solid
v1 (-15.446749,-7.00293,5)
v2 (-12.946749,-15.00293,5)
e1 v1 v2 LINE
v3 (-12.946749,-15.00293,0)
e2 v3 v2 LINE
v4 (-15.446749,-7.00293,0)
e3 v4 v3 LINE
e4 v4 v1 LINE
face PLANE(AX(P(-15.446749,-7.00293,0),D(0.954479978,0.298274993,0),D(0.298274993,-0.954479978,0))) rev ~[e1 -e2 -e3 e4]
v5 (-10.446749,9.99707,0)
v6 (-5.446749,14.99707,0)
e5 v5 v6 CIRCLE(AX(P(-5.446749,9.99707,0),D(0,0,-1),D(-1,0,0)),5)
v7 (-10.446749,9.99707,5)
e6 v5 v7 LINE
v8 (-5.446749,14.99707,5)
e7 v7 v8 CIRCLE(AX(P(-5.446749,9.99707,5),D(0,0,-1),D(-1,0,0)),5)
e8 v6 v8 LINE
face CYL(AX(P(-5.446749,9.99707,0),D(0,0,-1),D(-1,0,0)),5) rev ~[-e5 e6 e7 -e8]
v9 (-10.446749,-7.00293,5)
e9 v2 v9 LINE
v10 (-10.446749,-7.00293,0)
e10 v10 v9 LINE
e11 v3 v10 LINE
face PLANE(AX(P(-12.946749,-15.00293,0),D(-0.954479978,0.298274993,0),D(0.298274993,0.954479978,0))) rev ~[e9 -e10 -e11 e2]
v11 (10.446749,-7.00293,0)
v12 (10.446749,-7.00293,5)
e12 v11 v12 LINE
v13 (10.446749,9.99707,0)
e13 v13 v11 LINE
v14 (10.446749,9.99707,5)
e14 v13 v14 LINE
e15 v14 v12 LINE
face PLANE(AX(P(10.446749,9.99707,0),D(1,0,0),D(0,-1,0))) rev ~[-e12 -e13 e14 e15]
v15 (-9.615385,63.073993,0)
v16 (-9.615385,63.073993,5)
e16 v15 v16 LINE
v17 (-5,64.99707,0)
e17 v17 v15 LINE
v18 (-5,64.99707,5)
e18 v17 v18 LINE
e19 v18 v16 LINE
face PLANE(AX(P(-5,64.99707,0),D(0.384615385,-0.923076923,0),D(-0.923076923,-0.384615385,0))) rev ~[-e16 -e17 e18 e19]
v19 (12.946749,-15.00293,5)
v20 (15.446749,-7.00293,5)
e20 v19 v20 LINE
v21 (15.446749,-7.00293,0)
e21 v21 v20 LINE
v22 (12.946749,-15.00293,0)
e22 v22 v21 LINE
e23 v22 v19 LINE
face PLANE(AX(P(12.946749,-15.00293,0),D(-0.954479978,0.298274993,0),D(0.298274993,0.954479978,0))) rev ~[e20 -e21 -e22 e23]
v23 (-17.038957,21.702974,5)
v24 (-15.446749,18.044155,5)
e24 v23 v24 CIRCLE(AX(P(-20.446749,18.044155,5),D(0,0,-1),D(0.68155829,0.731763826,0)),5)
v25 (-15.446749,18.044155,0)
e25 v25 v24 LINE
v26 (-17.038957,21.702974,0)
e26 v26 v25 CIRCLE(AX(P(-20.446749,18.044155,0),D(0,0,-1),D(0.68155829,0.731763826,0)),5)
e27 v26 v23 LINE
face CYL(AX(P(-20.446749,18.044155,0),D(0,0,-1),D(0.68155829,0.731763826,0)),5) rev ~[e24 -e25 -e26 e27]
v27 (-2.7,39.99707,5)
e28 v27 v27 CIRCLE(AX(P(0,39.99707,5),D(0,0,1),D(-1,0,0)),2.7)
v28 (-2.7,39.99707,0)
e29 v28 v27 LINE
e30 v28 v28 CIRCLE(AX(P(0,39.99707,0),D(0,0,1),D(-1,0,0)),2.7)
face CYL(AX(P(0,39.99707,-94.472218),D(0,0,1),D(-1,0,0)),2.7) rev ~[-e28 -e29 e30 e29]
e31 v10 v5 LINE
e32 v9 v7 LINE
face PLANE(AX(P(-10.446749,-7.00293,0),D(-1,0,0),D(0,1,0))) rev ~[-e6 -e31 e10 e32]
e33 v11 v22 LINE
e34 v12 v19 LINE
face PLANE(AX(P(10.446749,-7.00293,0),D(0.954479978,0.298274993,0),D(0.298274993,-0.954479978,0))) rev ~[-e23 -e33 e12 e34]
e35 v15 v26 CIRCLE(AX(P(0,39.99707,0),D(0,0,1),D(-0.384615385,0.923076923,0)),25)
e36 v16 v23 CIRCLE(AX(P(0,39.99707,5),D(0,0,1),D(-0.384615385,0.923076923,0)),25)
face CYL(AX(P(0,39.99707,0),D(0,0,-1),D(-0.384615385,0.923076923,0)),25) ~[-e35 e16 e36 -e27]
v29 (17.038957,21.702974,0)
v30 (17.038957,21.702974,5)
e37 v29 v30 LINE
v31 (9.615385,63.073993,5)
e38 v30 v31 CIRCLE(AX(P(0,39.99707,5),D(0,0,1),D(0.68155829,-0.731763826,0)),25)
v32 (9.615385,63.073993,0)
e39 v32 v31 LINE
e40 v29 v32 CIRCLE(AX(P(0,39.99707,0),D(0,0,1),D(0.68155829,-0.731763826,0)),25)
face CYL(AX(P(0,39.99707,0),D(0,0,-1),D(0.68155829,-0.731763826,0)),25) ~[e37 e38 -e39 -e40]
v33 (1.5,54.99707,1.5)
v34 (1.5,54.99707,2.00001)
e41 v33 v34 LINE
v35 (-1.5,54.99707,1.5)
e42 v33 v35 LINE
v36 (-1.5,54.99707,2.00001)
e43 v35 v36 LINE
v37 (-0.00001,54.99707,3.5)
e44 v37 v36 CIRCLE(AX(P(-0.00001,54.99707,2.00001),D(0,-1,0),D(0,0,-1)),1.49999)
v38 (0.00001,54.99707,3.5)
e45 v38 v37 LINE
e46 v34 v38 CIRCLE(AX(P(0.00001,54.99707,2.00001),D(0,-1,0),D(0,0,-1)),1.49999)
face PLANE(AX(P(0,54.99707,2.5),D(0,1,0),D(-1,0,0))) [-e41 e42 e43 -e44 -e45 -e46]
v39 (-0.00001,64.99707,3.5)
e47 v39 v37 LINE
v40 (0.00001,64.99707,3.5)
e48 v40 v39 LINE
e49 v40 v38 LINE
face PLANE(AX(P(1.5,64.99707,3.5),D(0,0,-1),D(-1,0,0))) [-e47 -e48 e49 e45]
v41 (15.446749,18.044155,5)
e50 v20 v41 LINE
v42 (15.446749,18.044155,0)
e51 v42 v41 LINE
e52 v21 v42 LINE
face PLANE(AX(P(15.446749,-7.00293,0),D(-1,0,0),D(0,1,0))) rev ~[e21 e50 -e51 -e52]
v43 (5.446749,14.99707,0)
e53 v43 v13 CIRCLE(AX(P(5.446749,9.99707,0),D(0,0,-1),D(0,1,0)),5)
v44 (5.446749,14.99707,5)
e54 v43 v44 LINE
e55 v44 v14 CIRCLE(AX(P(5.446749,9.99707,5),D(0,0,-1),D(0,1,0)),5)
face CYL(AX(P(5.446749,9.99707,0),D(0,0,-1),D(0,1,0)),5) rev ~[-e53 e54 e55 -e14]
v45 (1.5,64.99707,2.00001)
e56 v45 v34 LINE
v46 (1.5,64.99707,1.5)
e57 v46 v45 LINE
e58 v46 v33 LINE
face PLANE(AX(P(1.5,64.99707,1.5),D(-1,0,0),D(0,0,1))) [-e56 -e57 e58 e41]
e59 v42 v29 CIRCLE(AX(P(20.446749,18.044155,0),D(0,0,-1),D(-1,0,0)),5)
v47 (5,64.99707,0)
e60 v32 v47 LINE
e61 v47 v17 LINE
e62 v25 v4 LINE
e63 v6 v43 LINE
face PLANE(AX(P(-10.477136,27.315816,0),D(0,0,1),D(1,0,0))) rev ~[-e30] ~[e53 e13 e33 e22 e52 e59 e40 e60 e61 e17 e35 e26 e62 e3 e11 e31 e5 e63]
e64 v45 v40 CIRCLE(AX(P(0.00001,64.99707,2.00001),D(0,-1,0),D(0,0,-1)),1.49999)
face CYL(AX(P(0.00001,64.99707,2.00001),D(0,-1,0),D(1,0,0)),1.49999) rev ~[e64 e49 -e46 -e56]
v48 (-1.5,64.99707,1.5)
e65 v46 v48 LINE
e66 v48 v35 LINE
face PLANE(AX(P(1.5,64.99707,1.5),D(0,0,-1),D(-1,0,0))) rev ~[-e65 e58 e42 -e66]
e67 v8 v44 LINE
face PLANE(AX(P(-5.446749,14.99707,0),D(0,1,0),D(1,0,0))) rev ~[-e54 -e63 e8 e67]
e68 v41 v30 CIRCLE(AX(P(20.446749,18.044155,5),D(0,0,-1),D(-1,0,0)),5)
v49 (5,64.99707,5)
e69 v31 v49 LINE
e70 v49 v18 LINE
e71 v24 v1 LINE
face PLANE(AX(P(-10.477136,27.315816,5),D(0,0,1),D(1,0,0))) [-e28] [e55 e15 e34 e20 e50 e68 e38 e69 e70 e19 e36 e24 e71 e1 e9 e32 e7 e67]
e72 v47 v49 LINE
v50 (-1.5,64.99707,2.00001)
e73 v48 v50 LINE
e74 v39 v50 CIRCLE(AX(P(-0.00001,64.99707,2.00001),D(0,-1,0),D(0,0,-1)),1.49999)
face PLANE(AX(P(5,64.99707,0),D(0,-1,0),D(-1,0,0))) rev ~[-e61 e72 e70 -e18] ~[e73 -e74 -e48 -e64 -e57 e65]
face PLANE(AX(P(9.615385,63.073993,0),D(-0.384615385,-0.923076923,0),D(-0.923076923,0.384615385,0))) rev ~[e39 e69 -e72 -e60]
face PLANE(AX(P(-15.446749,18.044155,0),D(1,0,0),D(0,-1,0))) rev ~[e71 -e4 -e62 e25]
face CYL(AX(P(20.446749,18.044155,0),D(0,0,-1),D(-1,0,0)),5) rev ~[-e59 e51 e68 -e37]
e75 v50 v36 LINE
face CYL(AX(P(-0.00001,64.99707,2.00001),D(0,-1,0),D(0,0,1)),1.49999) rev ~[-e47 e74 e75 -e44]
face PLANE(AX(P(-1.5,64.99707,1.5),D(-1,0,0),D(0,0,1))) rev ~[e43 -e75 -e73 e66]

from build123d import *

# Parameters (mm, degrees)
F1_DEPTH = 5
F2_D     = 5.4
F3_W     = 3
F3_H     = 2
F4_DEPTH = 10
F5_R     = 1.49999


# Not quite as in the source:
# - a fillet or chamfer is up to 0.001 mm smaller than in the source, because OpenCascade refuses the exact size


with BuildPart() as f1:
    # F0 (on Top) → F1 (new body)
    with BuildSketch(Plane.XY):
        with BuildLine():
            ThreePointArc((-17.0389572543, 21.7029743907), (-15.8620482104, 20.0392796609), (-15.4467487052, 18.0441552605))
            Line((-15.4467487052, 18.0441552605), (-15.4467487052, -7.0029299584))
            Line((-15.4467487052, -7.0029299584), (-12.9467487052, -15.0029299584))
            Line((-12.9467487052, -15.0029299584), (-10.4467487052, -7.0029299584))
            Line((-10.4467487052, -7.0029299584), (-10.4467487052, 9.9970700416))
            ThreePointArc((-10.4467487052, 9.9970700416), (-8.9822826112, 13.5326039476), (-5.4467487052, 14.9970700416))
            Line((-5.4467487052, 14.9970700416), (0, 14.9970700416))
            Line((0, 14.9970700416), (0, 37.4970700416))
            ThreePointArc((0, 37.4970700416), (-2.5, 39.9970700416), (0, 42.4970700416))
            Line((0, 42.4970700416), (0, 64.9970700416))
            Line((0, 64.9970700416), (-5, 64.9970700416))
            Line((-5, 64.9970700416), (-9.6153846154, 63.0739931186))
            ThreePointArc((-9.6153846154, 63.0739931186), (-24.6069864626, 44.4125221395), (-17.0389572543, 21.7029743907))
        make_face()
        with BuildLine():
            Line((0, 37.4970700416), (0, 42.4970700416))
            ThreePointArc((0, 42.4970700416), (-2.5, 39.9970700416), (0, 37.4970700416))
        make_face()
        with BuildLine():
            Line((5, 64.9970700416), (0, 64.9970700416))
            Line((0, 64.9970700416), (0, 42.4970700416))
            ThreePointArc((0, 42.4970700416), (2.5, 39.9970700416), (0, 37.4970700416))
            Line((0, 37.4970700416), (0, 14.9970700416))
            Line((0, 14.9970700416), (5.4467487052, 14.9970700416))
            ThreePointArc((5.4467487052, 14.9970700416), (8.9822826112, 13.5326039476), (10.4467487052, 9.9970700416))
            Line((10.4467487052, 9.9970700416), (10.4467487052, -7.0029299584))
            Line((10.4467487052, -7.0029299584), (12.9467487052, -15.0029299584))
            Line((12.9467487052, -15.0029299584), (15.4467487052, -7.0029299584))
            Line((15.4467487052, -7.0029299584), (15.4467487052, 18.0441552605))
            ThreePointArc((15.4467487052, 18.0441552605), (15.8620482104, 20.0392796609), (17.0389572543, 21.7029743907))
            ThreePointArc((17.0389572543, 21.7029743907), (24.6069864626, 44.4125221395), (9.6153846154, 63.0739931186))
            Line((9.6153846154, 63.0739931186), (5, 64.9970700416))
        make_face()
        with BuildLine():
            ThreePointArc((0, 37.4970700416), (2.5, 39.9970700416), (0, 42.4970700416))
            Line((0, 42.4970700416), (0, 37.4970700416))
        make_face()
    extrude(amount=F1_DEPTH)

    # F2 (through all)
    with Locations(Plane(origin=(0, 0, 0), x_dir=(1, 0, 0), z_dir=(0, 0, -1))):
        with Locations((0, -39.9970700416)):
            Hole(F2_D / 2)

    # F3 (on face) → F4 (cut)
    with BuildSketch(Plane(origin=(0, 64.9970700416, 0), x_dir=(-1, 0, 0), z_dir=(0, 1, 0))):
        with Locations((0, 2.5)):
            Rectangle(F3_W, F3_H)
    extrude(amount=-F4_DEPTH, mode=Mode.SUBTRACT)

    # F5 (radius 1.5 in the source; OpenCascade refuses exactly that, so slightly less here)
    f5_edges = [f1.edges().sort_by_distance(p)[0] for p in [
        (1.5, 59.99707, 3.5),
        (-1.5, 59.99707, 3.5),
    ]]
    fillet(f5_edges, radius=F5_R)


solid = f1.part
